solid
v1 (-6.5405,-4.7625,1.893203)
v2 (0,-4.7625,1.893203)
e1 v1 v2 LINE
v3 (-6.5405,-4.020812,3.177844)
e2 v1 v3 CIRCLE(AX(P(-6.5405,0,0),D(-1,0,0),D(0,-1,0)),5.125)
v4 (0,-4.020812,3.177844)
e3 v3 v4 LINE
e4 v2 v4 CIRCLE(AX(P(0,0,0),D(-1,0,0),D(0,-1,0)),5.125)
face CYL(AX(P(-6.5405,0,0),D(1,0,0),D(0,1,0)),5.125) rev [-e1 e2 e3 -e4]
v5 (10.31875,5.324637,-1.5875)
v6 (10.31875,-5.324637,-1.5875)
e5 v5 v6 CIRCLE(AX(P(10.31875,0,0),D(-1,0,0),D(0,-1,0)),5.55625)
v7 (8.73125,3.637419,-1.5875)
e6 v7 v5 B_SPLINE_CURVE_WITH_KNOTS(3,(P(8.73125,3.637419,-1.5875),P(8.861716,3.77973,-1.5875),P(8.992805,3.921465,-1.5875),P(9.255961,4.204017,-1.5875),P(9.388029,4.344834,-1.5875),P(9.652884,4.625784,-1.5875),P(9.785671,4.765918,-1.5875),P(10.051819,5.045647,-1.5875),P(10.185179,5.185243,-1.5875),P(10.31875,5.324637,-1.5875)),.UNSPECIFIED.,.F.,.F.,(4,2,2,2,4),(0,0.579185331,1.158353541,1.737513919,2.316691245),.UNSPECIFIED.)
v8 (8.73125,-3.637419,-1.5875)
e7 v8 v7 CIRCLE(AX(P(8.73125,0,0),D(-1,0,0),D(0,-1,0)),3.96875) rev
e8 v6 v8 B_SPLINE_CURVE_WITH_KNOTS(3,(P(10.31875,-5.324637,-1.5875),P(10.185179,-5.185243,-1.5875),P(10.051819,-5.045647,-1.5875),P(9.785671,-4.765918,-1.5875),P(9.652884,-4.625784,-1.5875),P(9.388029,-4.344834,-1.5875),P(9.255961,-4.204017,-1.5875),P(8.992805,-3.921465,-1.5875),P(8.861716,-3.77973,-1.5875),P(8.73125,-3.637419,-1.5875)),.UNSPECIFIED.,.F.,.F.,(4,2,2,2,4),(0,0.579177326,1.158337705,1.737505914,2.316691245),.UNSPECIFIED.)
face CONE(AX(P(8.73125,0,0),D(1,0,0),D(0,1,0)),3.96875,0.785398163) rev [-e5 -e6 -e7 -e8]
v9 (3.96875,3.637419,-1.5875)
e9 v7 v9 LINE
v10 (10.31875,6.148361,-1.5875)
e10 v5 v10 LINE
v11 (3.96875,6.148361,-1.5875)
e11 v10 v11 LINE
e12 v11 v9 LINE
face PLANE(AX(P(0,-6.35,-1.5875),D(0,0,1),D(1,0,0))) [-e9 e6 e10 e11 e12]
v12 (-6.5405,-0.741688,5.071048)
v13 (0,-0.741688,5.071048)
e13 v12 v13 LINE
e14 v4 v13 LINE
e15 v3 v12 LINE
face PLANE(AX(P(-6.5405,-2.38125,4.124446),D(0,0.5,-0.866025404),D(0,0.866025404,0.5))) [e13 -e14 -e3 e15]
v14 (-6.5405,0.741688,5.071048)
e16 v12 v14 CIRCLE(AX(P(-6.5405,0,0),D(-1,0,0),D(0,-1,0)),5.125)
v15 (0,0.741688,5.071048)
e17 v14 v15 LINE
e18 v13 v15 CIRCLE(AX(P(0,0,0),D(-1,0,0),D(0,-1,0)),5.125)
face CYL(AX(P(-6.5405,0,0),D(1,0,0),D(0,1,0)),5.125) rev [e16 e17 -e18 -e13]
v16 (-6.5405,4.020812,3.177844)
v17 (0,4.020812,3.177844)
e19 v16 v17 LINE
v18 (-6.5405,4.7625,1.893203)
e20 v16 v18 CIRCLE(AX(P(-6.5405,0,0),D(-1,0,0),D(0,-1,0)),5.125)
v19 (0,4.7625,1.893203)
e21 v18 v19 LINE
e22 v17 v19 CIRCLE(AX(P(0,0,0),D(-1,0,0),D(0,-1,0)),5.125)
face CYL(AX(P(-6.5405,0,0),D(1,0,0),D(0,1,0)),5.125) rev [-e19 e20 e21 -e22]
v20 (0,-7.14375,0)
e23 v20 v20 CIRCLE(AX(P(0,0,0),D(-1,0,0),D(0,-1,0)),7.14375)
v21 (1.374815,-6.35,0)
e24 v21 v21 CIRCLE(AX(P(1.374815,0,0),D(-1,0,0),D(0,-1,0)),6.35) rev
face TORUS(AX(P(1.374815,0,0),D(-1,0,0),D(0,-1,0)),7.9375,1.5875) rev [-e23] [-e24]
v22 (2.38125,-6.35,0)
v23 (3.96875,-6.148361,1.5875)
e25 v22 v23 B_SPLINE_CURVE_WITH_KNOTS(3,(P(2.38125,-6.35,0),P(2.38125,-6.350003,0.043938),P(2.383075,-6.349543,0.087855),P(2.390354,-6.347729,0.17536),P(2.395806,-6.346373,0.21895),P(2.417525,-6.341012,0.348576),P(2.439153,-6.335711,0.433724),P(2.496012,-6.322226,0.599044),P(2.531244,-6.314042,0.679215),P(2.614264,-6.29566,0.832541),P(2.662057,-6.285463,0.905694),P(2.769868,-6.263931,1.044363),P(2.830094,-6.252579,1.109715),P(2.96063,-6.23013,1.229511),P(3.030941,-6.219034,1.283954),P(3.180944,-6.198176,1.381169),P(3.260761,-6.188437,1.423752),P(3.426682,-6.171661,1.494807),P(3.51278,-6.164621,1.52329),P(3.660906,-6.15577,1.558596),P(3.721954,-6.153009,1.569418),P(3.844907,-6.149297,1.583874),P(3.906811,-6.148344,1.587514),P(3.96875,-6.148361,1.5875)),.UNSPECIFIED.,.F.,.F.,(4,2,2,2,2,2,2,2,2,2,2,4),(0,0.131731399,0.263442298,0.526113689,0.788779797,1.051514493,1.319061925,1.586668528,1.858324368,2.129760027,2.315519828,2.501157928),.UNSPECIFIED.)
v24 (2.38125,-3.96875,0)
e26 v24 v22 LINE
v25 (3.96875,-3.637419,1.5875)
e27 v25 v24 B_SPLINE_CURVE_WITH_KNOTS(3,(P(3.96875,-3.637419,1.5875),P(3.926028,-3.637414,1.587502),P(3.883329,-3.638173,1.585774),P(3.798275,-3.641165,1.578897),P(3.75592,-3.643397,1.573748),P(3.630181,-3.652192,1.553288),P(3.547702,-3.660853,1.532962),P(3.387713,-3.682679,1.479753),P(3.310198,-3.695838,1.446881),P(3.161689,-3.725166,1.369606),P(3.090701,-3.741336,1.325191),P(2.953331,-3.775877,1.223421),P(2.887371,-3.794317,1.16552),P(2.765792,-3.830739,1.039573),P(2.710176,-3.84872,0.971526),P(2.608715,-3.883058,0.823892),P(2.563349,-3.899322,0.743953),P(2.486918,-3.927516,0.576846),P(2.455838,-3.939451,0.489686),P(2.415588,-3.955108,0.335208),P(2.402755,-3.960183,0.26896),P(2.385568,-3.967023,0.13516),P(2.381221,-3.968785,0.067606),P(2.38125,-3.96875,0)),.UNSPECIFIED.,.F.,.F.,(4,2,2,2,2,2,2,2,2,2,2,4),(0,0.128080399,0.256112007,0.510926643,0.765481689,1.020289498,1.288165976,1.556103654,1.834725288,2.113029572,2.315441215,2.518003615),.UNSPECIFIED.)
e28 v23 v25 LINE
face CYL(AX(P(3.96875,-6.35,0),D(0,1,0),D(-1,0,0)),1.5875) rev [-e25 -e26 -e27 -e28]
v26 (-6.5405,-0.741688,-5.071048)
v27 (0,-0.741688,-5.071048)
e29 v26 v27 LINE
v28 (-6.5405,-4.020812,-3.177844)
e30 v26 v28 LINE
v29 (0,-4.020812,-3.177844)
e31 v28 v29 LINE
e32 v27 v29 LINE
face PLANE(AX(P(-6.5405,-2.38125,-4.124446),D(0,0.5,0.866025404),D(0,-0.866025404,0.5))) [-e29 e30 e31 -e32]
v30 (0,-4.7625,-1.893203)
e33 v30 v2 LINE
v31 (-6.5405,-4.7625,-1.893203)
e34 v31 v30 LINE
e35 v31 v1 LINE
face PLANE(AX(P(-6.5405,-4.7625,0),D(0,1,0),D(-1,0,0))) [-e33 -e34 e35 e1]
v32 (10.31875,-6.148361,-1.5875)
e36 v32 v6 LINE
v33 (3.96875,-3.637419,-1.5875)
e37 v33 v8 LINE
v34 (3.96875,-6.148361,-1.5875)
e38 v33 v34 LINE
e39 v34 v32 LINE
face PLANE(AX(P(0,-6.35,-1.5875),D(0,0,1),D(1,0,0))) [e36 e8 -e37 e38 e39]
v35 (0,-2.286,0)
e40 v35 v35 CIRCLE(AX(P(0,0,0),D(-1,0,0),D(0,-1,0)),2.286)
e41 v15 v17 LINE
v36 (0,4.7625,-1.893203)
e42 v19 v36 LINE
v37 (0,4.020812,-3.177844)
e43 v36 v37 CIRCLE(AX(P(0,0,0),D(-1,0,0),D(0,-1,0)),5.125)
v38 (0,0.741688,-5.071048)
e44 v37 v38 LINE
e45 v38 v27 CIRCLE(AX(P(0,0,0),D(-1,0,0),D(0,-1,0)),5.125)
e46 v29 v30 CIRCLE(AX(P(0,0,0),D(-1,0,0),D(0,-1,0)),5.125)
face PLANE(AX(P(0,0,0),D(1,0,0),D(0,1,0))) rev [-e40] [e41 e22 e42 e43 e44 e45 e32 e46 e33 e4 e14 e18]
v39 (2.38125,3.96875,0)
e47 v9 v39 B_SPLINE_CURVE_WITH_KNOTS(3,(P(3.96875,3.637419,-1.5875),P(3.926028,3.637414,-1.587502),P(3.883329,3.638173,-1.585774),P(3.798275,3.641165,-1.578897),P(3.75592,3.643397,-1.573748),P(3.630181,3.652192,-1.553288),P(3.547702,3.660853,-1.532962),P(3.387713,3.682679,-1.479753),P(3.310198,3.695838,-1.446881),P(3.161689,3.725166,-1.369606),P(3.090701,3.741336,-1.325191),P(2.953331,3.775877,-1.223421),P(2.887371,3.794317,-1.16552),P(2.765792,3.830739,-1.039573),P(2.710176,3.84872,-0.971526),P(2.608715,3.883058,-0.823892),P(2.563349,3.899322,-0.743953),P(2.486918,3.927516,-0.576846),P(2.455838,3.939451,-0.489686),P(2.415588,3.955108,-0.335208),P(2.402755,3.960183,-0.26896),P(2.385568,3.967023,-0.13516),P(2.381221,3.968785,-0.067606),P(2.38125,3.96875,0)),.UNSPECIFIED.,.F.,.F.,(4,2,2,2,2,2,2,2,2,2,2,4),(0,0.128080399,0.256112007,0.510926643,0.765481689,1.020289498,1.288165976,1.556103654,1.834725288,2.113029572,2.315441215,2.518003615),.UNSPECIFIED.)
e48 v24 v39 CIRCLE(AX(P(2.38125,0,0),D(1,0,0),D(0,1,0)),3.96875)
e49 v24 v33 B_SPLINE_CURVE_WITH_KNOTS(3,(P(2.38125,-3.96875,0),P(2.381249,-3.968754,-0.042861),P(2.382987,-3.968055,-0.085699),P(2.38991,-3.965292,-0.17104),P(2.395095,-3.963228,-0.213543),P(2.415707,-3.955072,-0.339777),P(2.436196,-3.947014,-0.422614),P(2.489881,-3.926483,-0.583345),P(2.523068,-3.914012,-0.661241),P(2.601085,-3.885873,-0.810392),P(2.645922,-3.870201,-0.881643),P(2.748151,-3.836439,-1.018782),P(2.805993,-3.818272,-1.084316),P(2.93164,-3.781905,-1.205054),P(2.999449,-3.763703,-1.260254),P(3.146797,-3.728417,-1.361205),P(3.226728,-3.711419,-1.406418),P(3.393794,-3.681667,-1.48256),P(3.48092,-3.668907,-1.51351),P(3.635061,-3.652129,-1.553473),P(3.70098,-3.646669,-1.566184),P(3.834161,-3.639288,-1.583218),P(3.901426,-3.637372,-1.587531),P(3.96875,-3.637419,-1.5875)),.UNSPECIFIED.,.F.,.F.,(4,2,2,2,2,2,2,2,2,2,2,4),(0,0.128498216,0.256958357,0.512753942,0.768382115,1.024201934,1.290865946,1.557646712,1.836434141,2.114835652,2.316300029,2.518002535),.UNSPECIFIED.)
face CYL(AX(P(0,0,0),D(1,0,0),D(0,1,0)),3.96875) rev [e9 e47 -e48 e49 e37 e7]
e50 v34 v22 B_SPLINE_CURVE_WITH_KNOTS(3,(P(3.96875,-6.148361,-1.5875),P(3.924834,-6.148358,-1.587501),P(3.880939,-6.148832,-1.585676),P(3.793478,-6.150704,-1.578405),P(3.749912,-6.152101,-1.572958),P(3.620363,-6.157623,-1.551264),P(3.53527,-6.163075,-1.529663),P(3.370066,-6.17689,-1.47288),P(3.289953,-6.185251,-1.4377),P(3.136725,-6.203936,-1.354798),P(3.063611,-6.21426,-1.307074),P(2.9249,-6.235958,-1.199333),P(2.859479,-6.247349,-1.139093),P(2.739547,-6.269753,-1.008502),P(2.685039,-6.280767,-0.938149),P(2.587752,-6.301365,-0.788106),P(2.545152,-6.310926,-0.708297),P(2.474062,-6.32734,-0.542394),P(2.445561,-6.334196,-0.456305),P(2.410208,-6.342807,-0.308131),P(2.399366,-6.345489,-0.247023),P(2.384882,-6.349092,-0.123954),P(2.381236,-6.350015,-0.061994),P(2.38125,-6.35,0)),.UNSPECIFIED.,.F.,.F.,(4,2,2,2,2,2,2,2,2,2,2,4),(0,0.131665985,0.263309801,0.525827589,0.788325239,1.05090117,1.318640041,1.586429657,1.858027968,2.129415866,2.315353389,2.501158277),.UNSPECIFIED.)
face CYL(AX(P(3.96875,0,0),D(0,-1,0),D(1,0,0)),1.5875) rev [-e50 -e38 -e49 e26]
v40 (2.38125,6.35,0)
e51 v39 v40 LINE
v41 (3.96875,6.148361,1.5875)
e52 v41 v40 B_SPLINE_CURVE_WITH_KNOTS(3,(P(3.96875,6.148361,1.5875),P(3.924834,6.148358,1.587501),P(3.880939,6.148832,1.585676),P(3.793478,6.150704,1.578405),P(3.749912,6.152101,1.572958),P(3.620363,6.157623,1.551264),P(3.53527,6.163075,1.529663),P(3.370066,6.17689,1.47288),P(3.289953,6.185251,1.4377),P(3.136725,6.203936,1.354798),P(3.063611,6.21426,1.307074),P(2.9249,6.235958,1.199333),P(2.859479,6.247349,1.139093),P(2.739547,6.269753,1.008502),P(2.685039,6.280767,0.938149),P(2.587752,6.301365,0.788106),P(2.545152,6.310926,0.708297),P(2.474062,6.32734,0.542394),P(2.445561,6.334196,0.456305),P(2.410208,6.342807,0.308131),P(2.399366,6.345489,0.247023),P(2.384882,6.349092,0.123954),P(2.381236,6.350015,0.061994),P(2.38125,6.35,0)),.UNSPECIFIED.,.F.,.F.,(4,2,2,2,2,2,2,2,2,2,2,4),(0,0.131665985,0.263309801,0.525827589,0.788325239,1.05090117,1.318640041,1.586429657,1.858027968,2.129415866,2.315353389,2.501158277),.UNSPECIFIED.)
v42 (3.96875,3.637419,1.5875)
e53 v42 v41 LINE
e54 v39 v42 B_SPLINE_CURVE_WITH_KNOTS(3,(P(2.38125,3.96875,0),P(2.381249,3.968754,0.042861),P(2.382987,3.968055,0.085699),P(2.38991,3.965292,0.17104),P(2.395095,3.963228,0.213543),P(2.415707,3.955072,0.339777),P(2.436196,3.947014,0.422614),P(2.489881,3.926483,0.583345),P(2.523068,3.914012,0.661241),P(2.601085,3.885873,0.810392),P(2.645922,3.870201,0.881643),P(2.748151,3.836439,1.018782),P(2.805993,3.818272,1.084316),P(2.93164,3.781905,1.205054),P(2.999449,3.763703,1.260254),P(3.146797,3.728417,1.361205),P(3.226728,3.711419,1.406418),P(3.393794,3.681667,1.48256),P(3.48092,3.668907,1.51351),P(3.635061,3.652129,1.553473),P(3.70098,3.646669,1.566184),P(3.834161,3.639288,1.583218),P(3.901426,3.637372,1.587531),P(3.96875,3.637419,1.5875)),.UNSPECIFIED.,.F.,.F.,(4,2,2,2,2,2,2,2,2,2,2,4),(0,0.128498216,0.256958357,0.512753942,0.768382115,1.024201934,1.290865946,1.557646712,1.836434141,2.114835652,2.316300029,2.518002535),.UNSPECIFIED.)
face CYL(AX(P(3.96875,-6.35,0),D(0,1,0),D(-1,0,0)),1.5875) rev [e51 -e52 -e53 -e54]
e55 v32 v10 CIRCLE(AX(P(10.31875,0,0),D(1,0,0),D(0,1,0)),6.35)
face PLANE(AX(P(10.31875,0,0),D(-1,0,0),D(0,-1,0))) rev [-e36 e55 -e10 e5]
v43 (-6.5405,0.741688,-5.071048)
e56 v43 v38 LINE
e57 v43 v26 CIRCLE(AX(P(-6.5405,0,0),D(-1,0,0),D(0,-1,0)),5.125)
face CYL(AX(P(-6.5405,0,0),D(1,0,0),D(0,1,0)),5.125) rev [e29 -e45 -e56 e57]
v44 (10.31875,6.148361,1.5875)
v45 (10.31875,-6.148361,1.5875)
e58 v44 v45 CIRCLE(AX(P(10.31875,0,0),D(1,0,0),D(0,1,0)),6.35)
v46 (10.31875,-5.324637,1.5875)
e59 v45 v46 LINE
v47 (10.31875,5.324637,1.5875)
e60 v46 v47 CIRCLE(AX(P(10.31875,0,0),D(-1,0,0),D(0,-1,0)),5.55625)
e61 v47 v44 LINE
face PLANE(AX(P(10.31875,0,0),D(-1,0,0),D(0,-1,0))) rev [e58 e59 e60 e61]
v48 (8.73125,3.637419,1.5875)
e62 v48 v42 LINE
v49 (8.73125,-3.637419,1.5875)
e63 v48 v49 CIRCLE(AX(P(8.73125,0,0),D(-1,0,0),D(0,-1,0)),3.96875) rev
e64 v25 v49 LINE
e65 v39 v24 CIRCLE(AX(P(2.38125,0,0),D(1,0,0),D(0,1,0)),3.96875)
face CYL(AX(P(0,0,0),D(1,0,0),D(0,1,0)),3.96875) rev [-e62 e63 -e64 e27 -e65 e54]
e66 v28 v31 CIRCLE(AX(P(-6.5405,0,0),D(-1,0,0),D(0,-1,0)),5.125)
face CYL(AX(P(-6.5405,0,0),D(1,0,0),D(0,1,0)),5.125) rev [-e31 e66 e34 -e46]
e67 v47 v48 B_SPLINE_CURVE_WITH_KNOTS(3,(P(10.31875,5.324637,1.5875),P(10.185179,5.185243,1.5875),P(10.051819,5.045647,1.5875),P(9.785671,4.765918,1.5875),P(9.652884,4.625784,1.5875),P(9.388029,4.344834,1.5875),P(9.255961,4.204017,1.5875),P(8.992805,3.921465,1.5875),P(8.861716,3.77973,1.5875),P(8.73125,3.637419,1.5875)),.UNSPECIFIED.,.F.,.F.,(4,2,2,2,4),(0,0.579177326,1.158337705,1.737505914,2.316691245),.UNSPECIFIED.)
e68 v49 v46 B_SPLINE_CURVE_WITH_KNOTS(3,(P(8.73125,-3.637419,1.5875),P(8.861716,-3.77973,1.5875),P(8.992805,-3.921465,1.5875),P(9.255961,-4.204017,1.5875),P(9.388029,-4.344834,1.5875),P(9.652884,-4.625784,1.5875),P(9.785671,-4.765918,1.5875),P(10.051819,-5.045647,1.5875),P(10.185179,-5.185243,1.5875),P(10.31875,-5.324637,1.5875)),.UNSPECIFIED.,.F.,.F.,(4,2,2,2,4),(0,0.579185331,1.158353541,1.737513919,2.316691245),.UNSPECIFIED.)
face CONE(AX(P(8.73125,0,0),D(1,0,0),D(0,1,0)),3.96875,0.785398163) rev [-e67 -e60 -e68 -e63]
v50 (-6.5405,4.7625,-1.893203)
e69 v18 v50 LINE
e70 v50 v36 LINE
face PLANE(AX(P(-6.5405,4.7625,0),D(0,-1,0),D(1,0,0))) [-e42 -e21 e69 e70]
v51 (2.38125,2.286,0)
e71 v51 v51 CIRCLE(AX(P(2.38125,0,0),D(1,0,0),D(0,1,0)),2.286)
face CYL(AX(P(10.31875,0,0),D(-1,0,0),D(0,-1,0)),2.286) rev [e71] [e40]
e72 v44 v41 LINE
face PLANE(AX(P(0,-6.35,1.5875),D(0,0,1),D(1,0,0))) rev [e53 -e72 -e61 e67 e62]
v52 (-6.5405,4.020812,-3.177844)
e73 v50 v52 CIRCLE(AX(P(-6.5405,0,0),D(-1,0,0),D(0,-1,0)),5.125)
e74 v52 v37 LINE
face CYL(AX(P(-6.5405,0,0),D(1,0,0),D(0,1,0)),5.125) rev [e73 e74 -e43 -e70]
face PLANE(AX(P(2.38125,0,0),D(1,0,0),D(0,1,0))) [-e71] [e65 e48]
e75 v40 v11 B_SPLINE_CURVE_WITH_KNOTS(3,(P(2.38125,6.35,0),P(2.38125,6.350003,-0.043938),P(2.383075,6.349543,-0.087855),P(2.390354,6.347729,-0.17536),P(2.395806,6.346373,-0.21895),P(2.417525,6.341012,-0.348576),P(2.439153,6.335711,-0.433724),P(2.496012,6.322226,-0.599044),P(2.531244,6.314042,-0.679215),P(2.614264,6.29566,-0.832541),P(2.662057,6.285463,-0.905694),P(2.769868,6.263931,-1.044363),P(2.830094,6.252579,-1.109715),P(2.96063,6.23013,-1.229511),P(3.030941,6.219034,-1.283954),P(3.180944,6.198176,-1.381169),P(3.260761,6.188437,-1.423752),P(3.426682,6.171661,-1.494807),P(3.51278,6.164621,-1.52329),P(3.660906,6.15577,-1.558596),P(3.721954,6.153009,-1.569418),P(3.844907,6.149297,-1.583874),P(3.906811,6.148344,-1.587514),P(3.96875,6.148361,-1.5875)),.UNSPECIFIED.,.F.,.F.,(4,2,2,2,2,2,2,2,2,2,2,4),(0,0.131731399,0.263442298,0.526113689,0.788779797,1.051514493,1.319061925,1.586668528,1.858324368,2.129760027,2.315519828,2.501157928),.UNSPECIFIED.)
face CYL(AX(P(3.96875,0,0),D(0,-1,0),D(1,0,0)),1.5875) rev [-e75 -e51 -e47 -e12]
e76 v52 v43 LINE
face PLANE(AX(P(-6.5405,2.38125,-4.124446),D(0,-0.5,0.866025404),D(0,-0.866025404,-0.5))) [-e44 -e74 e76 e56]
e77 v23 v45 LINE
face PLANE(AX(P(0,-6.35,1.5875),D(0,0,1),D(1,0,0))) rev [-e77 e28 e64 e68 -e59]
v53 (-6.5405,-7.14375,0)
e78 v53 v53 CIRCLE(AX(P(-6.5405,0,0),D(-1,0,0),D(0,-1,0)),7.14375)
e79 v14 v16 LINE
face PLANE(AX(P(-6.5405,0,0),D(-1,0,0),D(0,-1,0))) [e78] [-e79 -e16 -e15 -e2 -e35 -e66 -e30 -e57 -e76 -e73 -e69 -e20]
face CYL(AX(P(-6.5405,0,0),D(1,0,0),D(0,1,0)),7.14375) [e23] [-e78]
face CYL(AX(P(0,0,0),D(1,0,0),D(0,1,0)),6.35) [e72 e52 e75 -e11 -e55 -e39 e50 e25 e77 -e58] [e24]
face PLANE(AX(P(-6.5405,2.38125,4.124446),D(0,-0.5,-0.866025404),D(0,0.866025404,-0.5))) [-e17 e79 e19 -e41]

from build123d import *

# Parameters (mm, degrees)
SKETCH1_W               = 25.4
SKETCH1_H               = 3.175
SKETCH1_W_2             = 1.5875
SKETCH1_H_2             = 1.5875
SKETCH1_W_3             = 7.9375
SKETCH1_H_3             = 2.38125
CUT_EXTRUDE1_DEPTH      = 27.940768363
CUT_EXTRUDE1_DEPTH_BACK = 27.940768363
SKETCH2_W               = 0.79375
SKETCH2_H               = 3.175
SKETCH2_R               = 1.5875
FILLET1_R               = 1.5875
CHAMFER1_SIZE           = 1.5875
CUT_EXTRUDE2_DEPTH      = 27.94076841
SKETCH3_3_R             = 2.286
CUT_EXTRUDE3_DEPTH      = 14.67923997
SKETCH3_4_R             = 7.14375
BOSS_EXTRUDE1_DEPTH     = 6.5405
FILLET2_R               = 1.5875


# Some blends are built 0.0001 mm under size
with BuildPart() as part:
    # Sketch1 → Revolve1 (revolve)
    with BuildSketch(Plane.XY):
        with Locations((-12.7, 1.5875)):
            Rectangle(SKETCH1_W, SKETCH1_H)
        with Locations((-0.79375, 3.96875)):
            Rectangle(SKETCH1_W_2, SKETCH1_H_2)
        Polygon((0, 3.175), (0, 0), (2.38125, 0), (2.38125, 3.96875), (2.38125, 6.35), (0, 6.35), (0, 4.7625), align=None)
        with Locations((6.35, 5.159375)):
            Rectangle(SKETCH1_W_3, SKETCH1_H_3)
    revolve(axis=Axis((0, 0, 0), (-1, 0, 0)))

    # Sketch2 → Cut-Extrude1 (cut, two sides: drawn at the far end of the back side and taken through both)
    with BuildSketch(Plane(origin=(0, 0, 0), x_dir=(1, 0, 0), z_dir=(0, 1, 0)).offset(-CUT_EXTRUDE1_DEPTH_BACK)):
        with Locations((2.778125, 0)):
            Rectangle(SKETCH2_W, SKETCH2_H)
        with BuildLine():
            Line((3.175, -1.5875), (6.35, -1.5875))
            ThreePointArc((6.35, -1.5875), (4.7625, 0), (6.35, 1.5875))
            Line((6.35, 1.5875), (3.175, 1.5875))
            Line((3.175, 1.5875), (3.175, -1.5875))
        make_face()
        with Locations((6.35, 0)):
            Circle(SKETCH2_R)
        with BuildLine():
            Line((6.35, -1.5875), (10.31875, -1.5875))
            Line((10.31875, -1.5875), (10.31875, 1.5875))
            Line((10.31875, 1.5875), (6.35, 1.5875))
            ThreePointArc((6.35, 1.5875), (7.472532015, 1.122532015), (7.9375, 0))
            ThreePointArc((7.9375, 0), (7.472532015, -1.122532015), (6.35, -1.5875))
        make_face()
    extrude(amount=CUT_EXTRUDE1_DEPTH + CUT_EXTRUDE1_DEPTH_BACK, mode=Mode.SUBTRACT)

    # Fillet1
    fillet1_edges = [part.edges().sort_by_distance(p)[0] for p in [
        (2.38125, -4.89289026, -1.5875),
        (2.38125, 4.89289026, -1.5875),
        (2.38125, -4.89289026, 1.5875),
        (2.38125, 4.89289026, 1.5875),
    ]]
    fillet(fillet1_edges, radius=FILLET1_R - 0.0001)  # a hair under: the kernel refuses the full size

    # Chamfer1
    chamfer1_edges = [part.edges().sort_by_distance(p)[0] for p in [
        (10.31875, 0, 3.96875),
        (10.31875, 0, -3.96875),
    ]]
    chamfer(chamfer1_edges, length=CHAMFER1_SIZE)

    # Sketch3 → Cut-Extrude2 (cut, through all)
    with BuildSketch(Plane.ZY):
        with BuildLine():
            Line((-5.034429311, 5.567612646), (-7.338908645, 1.576137354))
            ThreePointArc((-7.338908645, 1.576137354), (-7.50625, 0), (-7.338908645, -1.576137354))
            Line((-7.338908645, -1.576137354), (-5.034429311, -5.567612646))
            ThreePointArc((-5.034429311, -5.567612646), (-3.753125, -6.500603187), (-2.304479334, -7.14375))
            Line((-2.304479334, -7.14375), (2.304479334, -7.14375))
            ThreePointArc((2.304479334, -7.14375), (3.753125, -6.500603187), (5.034429311, -5.567612646))
            Line((5.034429311, -5.567612646), (7.338908645, -1.576137354))
            ThreePointArc((7.338908645, -1.576137354), (7.50625, 0), (7.338908645, 1.576137354))
            Line((7.338908645, 1.576137354), (5.034429311, 5.567612646))
            ThreePointArc((5.034429311, 5.567612646), (3.753125, 6.500603187), (2.304479334, 7.14375))
            Line((2.304479334, 7.14375), (-2.304479334, 7.14375))
            ThreePointArc((-2.304479334, 7.14375), (-3.753125, 6.500603187), (-5.034429311, 5.567612646))
        make_face()
    extrude(amount=CUT_EXTRUDE2_DEPTH, mode=Mode.SUBTRACT)

    # Sketch3<3> → Cut-Extrude3 (cut, through all)
    with BuildSketch(Plane.ZY):
        with Locations(Location((0, 0, 0), (0, 0, 270))):
            Circle(SKETCH3_3_R)
    extrude(amount=-CUT_EXTRUDE3_DEPTH, mode=Mode.SUBTRACT)

    # Sketch3<4> → Boss-Extrude1 (add)
    with BuildSketch(Plane.ZY):
        with Locations(Location((0, 0, 0), (0, 0, 270))):
            Circle(SKETCH3_4_R)
        with BuildLine():
            Line((3.177844334, -4.020812156), (5.071047637, -0.741687844))
            ThreePointArc((5.071047637, -0.741687844), (5.125, 0), (5.071047637, 0.741687844))
            Line((5.071047637, 0.741687844), (3.177844334, 4.020812156))
            ThreePointArc((3.177844334, 4.020812156), (2.5625, 4.438380194), (1.893203304, 4.7625))
            Line((1.893203304, 4.7625), (-1.893203304, 4.7625))
            ThreePointArc((-1.893203304, 4.7625), (-2.5625, 4.438380194), (-3.177844334, 4.020812156))
            Line((-3.177844334, 4.020812156), (-5.071047637, 0.741687844))
            ThreePointArc((-5.071047637, 0.741687844), (-5.125, 0), (-5.071047637, -0.741687844))
            Line((-5.071047637, -0.741687844), (-3.177844334, -4.020812156))
            ThreePointArc((-3.177844334, -4.020812156), (-2.5625, -4.438380194), (-1.893203304, -4.7625))
            Line((-1.893203304, -4.7625), (1.893203304, -4.7625))
            ThreePointArc((1.893203304, -4.7625), (2.5625, -4.438380194), (3.177844334, -4.020812156))
        make_face(mode=Mode.SUBTRACT)
    extrude(amount=BOSS_EXTRUDE1_DEPTH)

    # Fillet2
    # the kernel refuses this fillet: 1.5875 mm, written as the material it adds along each edge
    with BuildSketch(Plane(origin=(0, 0, 0), x_dir=(0, 1, 0), z_dir=(0, 0, 1))) as fillet2_piece_1:
        with BuildLine():
            CenterArc((7.9375, -1.374815329), FILLET2_R, 120, 60)
            Line((7.14375, 0), (7.127875, 0.027496307))
            ThreePointArc((7.127875, 0.027496307), (6.746875, 0.03175), (6.35, 0.03175))
            Line((6.35, 0.03175), (6.31825, 0))
            Line((6.31825, 0), (6.31825, -1.374815329))
            Line((6.31825, -1.374815329), (6.35, -1.374815329))
        make_face()
    revolve(axis=Axis((0, 0, 0), (-1, 0, 0)))


solid = part.part
